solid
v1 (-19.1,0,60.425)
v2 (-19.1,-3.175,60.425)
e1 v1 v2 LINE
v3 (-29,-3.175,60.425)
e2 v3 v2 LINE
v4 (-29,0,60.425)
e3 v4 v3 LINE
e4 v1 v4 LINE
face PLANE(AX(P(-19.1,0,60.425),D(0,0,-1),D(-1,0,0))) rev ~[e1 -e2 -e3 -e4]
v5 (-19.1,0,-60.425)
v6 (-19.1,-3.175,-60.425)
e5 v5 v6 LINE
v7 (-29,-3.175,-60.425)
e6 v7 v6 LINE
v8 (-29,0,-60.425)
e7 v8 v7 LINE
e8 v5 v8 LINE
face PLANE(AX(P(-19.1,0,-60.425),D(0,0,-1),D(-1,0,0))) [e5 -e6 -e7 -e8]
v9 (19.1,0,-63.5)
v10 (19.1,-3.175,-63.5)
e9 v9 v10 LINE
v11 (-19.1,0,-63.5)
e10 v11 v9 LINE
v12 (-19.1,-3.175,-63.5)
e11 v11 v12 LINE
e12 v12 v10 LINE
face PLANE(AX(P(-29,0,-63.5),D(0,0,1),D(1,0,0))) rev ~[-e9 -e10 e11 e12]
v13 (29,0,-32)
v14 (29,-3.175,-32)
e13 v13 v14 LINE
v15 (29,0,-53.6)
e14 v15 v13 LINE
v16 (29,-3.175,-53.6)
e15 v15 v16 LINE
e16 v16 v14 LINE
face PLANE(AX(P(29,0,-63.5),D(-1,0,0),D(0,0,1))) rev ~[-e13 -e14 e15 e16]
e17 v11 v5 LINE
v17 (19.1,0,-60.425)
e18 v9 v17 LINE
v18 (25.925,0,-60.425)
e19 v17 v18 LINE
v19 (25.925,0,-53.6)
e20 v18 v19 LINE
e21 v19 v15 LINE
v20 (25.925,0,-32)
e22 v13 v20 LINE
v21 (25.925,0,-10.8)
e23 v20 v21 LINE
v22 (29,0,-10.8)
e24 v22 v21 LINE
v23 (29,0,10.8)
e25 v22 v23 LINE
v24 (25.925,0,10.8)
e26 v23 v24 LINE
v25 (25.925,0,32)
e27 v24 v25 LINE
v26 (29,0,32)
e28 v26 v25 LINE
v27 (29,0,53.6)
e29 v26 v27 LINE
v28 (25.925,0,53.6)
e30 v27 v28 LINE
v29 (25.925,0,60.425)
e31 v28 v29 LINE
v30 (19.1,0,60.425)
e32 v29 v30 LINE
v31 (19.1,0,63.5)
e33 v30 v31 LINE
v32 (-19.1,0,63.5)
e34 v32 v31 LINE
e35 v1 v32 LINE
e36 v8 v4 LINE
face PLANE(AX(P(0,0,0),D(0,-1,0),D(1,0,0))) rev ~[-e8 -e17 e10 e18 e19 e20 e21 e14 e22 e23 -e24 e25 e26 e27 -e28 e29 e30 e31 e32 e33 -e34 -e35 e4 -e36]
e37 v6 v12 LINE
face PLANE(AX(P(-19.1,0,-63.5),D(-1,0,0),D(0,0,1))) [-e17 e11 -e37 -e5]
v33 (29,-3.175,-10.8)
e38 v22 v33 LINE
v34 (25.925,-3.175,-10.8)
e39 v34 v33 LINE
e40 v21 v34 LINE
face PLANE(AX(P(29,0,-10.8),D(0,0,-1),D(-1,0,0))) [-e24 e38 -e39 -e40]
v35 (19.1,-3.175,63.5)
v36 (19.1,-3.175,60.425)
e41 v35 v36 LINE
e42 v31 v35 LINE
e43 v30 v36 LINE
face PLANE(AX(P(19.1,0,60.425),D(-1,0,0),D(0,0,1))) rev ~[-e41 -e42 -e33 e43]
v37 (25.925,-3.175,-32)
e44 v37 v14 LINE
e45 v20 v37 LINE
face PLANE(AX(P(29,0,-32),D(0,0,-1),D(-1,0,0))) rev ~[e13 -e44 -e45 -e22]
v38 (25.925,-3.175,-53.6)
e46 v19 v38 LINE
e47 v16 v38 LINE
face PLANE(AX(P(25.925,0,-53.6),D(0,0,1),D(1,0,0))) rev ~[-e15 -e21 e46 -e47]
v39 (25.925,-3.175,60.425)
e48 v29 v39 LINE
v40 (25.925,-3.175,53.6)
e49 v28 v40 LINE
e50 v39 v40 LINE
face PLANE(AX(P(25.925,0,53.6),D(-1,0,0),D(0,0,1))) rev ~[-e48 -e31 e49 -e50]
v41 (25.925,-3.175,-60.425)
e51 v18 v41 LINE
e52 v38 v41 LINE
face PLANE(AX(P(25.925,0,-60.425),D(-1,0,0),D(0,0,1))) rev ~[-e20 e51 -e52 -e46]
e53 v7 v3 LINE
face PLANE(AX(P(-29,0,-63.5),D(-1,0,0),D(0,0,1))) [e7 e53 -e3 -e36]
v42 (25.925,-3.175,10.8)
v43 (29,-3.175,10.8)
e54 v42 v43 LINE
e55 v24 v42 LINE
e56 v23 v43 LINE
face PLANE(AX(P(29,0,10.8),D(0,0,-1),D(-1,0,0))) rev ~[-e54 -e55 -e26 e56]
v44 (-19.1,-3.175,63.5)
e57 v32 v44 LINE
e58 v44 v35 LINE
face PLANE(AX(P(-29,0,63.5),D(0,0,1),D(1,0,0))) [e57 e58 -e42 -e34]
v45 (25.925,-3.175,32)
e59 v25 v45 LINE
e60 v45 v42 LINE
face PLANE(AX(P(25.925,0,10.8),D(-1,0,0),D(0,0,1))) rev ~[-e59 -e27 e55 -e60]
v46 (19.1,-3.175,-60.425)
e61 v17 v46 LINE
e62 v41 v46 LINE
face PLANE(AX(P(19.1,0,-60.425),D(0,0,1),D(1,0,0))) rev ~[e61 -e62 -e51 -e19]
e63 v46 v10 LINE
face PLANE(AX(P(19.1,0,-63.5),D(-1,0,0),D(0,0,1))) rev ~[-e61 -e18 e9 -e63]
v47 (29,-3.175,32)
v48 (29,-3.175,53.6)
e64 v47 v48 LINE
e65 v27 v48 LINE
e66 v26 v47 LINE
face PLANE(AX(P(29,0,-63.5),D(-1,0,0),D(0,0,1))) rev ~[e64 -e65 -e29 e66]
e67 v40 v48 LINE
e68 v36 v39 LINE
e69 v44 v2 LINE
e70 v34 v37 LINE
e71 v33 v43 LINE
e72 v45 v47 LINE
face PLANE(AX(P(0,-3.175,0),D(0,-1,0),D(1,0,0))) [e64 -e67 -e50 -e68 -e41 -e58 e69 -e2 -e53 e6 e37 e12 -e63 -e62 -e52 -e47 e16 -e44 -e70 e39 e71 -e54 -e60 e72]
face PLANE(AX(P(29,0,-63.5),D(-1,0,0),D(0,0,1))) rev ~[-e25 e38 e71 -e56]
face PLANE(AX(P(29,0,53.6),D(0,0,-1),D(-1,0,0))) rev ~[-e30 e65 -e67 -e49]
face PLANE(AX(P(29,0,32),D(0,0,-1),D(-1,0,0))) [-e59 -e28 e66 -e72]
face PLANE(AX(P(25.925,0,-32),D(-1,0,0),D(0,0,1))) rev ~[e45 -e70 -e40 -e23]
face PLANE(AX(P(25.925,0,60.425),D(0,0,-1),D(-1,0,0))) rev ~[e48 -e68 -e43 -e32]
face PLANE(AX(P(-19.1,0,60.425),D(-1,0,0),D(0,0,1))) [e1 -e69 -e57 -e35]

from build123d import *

# Parameters (mm, degrees)
F0_W     = 58
F0_H     = 127
F1_DEPTH = 3.175
F2_W     = 3.075
F2_H     = 21.2
F2_W_2   = 9.9
F2_H_2   = 3.075
F3_DEPTH = 25


# Not quite as in the source:
# - a length typed as a fraction of an inch, garbled in the dataset ("3 / 203.2 mm" for 3/8 in), is restored


with BuildPart() as f1:
    # F0 (on Front) → F1 (new body)
    with BuildSketch(Plane.XZ):
        Rectangle(F0_W, F0_H)
    extrude(amount=F1_DEPTH)

    # F2 (on face) → F3 (cut)
    with BuildSketch(Plane(origin=(0, 0, 0), x_dir=(-1, 0, 0), z_dir=(0, 1, 0))):
        Polygon((-19.1, 63.5), (-29, 63.5), (-29, 53.6), (-25.925, 53.6), (-25.925, 60.425), (-19.1, 60.425), align=None)
        with Locations((-27.4625, 21.4)):
            Rectangle(F2_W, F2_H)
        with Locations((-27.4625, -21.4)):
            Rectangle(F2_W, F2_H)
        Polygon((-25.925, -53.6), (-29, -53.6), (-29, -63.5), (-19.1, -63.5), (-19.1, -60.425), (-25.925, -60.425), align=None)
        with Locations((24.05, 61.9625)):
            Rectangle(F2_W_2, F2_H_2)
        with Locations((24.05, -61.9625)):
            Rectangle(F2_W_2, F2_H_2)
    extrude(amount=-F3_DEPTH, mode=Mode.SUBTRACT)


solid = f1.part
